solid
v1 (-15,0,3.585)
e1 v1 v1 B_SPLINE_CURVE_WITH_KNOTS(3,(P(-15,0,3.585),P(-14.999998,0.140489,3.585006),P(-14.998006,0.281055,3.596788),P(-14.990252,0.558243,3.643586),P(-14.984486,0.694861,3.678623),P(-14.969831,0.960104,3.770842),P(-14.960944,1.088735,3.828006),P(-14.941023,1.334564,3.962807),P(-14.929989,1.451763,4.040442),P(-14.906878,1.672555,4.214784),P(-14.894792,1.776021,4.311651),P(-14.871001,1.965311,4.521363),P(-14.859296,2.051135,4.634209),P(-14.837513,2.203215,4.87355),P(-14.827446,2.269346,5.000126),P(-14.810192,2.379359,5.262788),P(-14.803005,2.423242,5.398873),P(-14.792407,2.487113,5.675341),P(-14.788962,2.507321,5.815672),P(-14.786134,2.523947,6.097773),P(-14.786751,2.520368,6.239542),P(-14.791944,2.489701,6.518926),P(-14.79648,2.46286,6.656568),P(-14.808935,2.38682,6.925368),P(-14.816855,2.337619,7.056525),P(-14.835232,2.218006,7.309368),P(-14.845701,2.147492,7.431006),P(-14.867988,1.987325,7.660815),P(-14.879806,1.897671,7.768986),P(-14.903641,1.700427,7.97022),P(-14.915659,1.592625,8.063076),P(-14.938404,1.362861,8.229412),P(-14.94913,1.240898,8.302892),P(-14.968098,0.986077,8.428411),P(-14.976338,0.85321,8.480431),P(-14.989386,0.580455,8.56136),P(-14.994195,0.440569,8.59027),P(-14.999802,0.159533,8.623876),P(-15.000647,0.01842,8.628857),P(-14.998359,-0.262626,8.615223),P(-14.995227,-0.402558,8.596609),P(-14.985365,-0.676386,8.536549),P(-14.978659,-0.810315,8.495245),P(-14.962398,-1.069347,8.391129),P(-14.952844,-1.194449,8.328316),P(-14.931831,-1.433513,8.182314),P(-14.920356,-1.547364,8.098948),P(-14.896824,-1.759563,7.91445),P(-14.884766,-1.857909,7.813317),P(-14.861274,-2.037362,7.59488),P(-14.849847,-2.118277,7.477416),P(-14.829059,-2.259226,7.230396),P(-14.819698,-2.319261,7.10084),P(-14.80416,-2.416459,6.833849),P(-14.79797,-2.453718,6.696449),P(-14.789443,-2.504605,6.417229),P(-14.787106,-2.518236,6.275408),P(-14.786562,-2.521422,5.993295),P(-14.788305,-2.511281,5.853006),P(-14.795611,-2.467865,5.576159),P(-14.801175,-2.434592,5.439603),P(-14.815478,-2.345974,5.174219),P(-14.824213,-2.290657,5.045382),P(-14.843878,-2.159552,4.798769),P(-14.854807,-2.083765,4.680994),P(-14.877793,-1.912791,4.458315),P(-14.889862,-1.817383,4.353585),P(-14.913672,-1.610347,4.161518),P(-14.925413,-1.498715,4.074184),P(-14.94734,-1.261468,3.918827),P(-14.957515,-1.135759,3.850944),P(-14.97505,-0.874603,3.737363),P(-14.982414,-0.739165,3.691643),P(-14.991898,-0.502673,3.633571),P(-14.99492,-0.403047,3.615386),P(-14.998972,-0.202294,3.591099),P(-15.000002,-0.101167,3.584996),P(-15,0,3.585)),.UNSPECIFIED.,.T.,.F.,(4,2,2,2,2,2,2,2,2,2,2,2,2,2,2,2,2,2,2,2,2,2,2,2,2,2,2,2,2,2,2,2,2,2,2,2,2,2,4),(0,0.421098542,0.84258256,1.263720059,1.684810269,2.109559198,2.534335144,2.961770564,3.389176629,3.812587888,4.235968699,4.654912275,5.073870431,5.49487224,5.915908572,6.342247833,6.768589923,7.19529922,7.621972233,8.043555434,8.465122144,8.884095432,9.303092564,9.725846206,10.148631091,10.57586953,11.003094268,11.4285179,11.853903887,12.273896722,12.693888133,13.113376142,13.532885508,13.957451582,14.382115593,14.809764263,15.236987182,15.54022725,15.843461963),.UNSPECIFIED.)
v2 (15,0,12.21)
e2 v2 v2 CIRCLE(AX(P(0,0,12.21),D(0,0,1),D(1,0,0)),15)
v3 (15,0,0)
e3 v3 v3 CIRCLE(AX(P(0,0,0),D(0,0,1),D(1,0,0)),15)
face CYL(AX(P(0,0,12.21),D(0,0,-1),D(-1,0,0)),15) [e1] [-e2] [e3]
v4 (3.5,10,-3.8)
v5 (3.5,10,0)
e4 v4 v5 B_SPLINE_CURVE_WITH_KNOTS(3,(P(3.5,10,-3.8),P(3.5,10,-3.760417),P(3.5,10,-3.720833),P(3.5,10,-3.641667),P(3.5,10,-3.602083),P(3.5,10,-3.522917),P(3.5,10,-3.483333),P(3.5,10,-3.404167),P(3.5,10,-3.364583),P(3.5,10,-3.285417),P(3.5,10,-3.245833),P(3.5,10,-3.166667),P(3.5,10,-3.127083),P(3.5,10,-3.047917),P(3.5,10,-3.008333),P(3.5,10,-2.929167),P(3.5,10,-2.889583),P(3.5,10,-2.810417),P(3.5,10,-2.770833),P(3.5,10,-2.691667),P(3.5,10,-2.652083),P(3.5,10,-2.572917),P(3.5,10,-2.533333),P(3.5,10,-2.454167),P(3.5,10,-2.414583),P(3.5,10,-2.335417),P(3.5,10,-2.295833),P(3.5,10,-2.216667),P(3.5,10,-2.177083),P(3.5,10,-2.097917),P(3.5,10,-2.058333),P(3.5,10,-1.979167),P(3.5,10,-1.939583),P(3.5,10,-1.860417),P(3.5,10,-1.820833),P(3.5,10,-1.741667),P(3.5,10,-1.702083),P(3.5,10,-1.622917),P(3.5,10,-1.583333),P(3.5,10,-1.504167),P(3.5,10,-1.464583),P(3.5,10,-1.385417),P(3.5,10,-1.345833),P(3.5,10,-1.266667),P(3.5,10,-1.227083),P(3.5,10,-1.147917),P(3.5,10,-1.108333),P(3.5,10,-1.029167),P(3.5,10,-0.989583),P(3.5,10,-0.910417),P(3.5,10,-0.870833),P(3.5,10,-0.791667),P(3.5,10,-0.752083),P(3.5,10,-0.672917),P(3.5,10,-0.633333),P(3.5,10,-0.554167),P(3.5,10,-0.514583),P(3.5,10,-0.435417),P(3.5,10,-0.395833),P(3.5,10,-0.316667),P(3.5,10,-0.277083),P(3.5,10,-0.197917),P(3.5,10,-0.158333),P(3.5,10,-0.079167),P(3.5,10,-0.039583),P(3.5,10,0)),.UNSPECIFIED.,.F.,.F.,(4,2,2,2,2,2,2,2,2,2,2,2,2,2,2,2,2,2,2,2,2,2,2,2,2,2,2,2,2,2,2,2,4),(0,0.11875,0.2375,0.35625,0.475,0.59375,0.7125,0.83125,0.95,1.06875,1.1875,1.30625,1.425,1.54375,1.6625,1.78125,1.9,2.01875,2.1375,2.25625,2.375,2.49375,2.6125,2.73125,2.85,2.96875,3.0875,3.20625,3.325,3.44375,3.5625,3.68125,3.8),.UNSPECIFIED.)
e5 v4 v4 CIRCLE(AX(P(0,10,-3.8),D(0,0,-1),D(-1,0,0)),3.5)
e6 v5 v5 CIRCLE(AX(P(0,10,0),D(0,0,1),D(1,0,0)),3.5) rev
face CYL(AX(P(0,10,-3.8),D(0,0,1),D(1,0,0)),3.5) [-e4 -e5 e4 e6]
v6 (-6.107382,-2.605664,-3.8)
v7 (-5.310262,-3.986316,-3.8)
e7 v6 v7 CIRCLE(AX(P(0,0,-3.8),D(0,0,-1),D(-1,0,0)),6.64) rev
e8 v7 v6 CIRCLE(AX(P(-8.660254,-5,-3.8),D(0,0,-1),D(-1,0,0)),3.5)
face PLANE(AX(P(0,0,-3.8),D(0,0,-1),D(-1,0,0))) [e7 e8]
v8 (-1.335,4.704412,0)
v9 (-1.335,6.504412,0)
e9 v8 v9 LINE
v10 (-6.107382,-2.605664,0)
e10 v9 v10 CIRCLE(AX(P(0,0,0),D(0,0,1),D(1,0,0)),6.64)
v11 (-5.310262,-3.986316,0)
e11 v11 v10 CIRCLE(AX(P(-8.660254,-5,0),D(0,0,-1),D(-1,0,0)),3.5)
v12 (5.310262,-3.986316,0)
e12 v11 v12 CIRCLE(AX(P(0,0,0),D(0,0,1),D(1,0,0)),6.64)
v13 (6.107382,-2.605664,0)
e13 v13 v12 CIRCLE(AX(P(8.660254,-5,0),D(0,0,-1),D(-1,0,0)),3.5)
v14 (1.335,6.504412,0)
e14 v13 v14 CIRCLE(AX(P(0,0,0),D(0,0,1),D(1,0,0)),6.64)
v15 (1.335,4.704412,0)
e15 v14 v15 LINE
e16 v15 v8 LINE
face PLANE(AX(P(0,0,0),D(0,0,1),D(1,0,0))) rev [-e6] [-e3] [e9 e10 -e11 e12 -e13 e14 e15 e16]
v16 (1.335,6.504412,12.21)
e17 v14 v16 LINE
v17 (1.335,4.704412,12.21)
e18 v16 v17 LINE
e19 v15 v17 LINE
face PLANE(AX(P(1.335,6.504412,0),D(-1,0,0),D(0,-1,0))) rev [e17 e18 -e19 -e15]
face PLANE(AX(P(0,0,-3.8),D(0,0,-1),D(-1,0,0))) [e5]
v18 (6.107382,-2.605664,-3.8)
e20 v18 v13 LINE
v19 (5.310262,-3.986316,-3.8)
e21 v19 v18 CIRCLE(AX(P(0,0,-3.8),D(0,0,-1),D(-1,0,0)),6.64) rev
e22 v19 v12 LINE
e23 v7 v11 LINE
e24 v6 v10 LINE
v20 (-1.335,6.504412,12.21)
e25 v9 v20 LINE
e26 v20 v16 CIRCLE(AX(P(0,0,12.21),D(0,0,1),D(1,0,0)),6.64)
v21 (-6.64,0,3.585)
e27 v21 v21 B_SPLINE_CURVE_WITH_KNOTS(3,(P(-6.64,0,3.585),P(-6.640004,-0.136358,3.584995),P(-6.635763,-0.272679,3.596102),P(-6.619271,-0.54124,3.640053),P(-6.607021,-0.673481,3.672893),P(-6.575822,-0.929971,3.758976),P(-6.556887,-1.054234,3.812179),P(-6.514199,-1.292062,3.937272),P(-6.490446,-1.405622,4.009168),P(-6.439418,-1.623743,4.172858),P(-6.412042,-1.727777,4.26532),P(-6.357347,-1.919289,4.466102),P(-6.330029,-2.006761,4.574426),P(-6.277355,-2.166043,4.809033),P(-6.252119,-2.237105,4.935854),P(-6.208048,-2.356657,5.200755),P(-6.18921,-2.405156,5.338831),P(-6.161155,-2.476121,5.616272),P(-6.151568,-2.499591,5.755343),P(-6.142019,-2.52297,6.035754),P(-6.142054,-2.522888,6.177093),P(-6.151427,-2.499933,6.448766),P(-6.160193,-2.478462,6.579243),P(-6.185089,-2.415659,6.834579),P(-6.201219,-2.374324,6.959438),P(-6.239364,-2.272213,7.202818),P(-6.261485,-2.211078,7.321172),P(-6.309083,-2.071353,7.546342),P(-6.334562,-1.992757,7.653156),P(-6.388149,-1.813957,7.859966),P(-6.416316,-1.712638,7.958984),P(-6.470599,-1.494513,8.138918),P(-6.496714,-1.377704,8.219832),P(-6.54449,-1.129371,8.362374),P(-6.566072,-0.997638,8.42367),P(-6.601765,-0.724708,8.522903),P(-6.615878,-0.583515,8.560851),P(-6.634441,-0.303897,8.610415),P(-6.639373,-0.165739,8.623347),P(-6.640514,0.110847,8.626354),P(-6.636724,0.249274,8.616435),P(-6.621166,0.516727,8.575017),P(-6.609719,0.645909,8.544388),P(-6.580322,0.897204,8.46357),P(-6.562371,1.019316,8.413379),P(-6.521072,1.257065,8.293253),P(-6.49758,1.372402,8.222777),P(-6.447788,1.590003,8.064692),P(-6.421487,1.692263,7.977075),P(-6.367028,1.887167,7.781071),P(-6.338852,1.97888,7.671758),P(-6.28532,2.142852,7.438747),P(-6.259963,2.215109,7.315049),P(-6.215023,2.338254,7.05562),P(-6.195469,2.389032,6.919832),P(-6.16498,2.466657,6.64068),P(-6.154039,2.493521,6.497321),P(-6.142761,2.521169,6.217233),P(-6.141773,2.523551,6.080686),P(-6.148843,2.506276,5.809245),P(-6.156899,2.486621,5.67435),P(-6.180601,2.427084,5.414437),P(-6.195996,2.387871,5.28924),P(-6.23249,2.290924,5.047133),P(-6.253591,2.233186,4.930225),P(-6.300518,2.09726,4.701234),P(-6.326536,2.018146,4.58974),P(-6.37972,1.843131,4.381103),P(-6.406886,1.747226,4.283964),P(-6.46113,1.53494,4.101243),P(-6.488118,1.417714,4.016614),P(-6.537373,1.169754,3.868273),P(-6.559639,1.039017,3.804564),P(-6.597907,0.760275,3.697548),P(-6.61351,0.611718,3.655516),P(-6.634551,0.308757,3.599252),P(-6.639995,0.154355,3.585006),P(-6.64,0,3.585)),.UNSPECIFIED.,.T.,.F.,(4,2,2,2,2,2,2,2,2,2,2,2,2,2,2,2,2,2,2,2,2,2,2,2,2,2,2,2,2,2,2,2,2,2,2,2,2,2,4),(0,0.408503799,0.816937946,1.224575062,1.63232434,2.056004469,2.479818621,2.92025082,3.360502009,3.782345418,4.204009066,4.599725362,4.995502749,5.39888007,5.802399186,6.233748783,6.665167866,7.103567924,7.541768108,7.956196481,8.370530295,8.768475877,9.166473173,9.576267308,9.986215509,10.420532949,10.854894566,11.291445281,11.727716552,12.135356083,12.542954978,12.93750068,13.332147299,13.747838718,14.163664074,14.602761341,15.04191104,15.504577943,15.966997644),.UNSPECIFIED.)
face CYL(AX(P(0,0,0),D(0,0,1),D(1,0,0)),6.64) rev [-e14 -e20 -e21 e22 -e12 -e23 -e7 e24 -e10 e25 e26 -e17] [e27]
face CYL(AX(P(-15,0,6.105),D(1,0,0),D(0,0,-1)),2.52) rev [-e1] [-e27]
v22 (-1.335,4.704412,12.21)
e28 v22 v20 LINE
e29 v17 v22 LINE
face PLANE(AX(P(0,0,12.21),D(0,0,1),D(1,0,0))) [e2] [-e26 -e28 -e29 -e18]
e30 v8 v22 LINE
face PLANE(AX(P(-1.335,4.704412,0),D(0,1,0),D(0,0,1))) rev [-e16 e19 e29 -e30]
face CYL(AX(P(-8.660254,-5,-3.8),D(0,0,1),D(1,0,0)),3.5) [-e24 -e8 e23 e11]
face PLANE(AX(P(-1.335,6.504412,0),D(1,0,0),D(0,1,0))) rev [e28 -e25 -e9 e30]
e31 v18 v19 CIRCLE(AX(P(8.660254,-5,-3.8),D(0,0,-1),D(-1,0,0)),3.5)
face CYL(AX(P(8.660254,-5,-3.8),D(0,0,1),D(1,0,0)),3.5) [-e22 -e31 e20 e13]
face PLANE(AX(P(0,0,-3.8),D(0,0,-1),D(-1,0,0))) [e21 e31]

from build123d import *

# Parameters (mm, degrees)
GEARFACEPROFILE_R        = 15
GEARFACEEXTRUDE_DEPTH    = 12.21
CENTERSLOT_DEPTH         = 25.476194557
GEARCONNECTORS_OUTLINE_R = 3.5
GEARCONNECTORS_DEPTH     = 3.8
SETSCREWPROFILE_R        = 2.52
SETSCREWHOLE_DEPTH       = 25.476194557


# Read off the part's stored shape, not the designer's step: GearConnectors
with BuildPart() as part:
    # GearFaceProfile → GearFaceExtrude (new body)
    with BuildSketch(Plane.XY):
        Circle(GEARFACEPROFILE_R)
    extrude(amount=GEARFACEEXTRUDE_DEPTH)

    # Sketch1 → CenterSlot (cut, through all)
    with BuildSketch(Plane.XY.offset(12.21)):
        with BuildLine():
            Line((-1.335, 6.504411964), (-1.335, 4.704411964))
            Line((-1.335, 4.704411964), (1.335, 4.704411964))
            Line((1.335, 4.704411964), (1.335, 6.504411964))
            ThreePointArc((1.335, 6.504411964), (0, -6.64), (-1.335, 6.504411964))
        make_face()
    extrude(amount=-CENTERSLOT_DEPTH, mode=Mode.SUBTRACT)

    # GearConnectors outline → GearConnectors (add)
    with BuildSketch(Plane(origin=(0, 0, 0), x_dir=(-1, 0, 0), z_dir=(0, 0, -1))):
        with BuildLine():
            ThreePointArc((5.310262334, -3.986315836), (11.691342952, -6.749999998), (6.107381948, -2.605664164))
            ThreePointArc((6.107381948, -2.605664164), (5.750408681, -3.32), (5.310262334, -3.986315836))
        make_face()
        with BuildLine():
            ThreePointArc((-6.107381948, -2.605664164), (-11.691342952, -6.749999998), (-5.310262334, -3.986315836))
            ThreePointArc((-5.310262334, -3.986315836), (-5.750408681, -3.32), (-6.107381948, -2.605664164))
        make_face()
        with Locations((0, 10)):
            Circle(GEARCONNECTORS_OUTLINE_R)
    extrude(amount=GEARCONNECTORS_DEPTH)

    # SetScrewProfile → SetScrewHole (cut, through all)
    with BuildSketch(Plane(origin=(0, 0, 0), x_dir=(0, 0, -1), z_dir=(1, 0, 0))):
        with Locations((-6.105, 0)):
            Circle(SETSCREWPROFILE_R)
    extrude(amount=-SETSCREWHOLE_DEPTH, mode=Mode.SUBTRACT)


solid = part.part
